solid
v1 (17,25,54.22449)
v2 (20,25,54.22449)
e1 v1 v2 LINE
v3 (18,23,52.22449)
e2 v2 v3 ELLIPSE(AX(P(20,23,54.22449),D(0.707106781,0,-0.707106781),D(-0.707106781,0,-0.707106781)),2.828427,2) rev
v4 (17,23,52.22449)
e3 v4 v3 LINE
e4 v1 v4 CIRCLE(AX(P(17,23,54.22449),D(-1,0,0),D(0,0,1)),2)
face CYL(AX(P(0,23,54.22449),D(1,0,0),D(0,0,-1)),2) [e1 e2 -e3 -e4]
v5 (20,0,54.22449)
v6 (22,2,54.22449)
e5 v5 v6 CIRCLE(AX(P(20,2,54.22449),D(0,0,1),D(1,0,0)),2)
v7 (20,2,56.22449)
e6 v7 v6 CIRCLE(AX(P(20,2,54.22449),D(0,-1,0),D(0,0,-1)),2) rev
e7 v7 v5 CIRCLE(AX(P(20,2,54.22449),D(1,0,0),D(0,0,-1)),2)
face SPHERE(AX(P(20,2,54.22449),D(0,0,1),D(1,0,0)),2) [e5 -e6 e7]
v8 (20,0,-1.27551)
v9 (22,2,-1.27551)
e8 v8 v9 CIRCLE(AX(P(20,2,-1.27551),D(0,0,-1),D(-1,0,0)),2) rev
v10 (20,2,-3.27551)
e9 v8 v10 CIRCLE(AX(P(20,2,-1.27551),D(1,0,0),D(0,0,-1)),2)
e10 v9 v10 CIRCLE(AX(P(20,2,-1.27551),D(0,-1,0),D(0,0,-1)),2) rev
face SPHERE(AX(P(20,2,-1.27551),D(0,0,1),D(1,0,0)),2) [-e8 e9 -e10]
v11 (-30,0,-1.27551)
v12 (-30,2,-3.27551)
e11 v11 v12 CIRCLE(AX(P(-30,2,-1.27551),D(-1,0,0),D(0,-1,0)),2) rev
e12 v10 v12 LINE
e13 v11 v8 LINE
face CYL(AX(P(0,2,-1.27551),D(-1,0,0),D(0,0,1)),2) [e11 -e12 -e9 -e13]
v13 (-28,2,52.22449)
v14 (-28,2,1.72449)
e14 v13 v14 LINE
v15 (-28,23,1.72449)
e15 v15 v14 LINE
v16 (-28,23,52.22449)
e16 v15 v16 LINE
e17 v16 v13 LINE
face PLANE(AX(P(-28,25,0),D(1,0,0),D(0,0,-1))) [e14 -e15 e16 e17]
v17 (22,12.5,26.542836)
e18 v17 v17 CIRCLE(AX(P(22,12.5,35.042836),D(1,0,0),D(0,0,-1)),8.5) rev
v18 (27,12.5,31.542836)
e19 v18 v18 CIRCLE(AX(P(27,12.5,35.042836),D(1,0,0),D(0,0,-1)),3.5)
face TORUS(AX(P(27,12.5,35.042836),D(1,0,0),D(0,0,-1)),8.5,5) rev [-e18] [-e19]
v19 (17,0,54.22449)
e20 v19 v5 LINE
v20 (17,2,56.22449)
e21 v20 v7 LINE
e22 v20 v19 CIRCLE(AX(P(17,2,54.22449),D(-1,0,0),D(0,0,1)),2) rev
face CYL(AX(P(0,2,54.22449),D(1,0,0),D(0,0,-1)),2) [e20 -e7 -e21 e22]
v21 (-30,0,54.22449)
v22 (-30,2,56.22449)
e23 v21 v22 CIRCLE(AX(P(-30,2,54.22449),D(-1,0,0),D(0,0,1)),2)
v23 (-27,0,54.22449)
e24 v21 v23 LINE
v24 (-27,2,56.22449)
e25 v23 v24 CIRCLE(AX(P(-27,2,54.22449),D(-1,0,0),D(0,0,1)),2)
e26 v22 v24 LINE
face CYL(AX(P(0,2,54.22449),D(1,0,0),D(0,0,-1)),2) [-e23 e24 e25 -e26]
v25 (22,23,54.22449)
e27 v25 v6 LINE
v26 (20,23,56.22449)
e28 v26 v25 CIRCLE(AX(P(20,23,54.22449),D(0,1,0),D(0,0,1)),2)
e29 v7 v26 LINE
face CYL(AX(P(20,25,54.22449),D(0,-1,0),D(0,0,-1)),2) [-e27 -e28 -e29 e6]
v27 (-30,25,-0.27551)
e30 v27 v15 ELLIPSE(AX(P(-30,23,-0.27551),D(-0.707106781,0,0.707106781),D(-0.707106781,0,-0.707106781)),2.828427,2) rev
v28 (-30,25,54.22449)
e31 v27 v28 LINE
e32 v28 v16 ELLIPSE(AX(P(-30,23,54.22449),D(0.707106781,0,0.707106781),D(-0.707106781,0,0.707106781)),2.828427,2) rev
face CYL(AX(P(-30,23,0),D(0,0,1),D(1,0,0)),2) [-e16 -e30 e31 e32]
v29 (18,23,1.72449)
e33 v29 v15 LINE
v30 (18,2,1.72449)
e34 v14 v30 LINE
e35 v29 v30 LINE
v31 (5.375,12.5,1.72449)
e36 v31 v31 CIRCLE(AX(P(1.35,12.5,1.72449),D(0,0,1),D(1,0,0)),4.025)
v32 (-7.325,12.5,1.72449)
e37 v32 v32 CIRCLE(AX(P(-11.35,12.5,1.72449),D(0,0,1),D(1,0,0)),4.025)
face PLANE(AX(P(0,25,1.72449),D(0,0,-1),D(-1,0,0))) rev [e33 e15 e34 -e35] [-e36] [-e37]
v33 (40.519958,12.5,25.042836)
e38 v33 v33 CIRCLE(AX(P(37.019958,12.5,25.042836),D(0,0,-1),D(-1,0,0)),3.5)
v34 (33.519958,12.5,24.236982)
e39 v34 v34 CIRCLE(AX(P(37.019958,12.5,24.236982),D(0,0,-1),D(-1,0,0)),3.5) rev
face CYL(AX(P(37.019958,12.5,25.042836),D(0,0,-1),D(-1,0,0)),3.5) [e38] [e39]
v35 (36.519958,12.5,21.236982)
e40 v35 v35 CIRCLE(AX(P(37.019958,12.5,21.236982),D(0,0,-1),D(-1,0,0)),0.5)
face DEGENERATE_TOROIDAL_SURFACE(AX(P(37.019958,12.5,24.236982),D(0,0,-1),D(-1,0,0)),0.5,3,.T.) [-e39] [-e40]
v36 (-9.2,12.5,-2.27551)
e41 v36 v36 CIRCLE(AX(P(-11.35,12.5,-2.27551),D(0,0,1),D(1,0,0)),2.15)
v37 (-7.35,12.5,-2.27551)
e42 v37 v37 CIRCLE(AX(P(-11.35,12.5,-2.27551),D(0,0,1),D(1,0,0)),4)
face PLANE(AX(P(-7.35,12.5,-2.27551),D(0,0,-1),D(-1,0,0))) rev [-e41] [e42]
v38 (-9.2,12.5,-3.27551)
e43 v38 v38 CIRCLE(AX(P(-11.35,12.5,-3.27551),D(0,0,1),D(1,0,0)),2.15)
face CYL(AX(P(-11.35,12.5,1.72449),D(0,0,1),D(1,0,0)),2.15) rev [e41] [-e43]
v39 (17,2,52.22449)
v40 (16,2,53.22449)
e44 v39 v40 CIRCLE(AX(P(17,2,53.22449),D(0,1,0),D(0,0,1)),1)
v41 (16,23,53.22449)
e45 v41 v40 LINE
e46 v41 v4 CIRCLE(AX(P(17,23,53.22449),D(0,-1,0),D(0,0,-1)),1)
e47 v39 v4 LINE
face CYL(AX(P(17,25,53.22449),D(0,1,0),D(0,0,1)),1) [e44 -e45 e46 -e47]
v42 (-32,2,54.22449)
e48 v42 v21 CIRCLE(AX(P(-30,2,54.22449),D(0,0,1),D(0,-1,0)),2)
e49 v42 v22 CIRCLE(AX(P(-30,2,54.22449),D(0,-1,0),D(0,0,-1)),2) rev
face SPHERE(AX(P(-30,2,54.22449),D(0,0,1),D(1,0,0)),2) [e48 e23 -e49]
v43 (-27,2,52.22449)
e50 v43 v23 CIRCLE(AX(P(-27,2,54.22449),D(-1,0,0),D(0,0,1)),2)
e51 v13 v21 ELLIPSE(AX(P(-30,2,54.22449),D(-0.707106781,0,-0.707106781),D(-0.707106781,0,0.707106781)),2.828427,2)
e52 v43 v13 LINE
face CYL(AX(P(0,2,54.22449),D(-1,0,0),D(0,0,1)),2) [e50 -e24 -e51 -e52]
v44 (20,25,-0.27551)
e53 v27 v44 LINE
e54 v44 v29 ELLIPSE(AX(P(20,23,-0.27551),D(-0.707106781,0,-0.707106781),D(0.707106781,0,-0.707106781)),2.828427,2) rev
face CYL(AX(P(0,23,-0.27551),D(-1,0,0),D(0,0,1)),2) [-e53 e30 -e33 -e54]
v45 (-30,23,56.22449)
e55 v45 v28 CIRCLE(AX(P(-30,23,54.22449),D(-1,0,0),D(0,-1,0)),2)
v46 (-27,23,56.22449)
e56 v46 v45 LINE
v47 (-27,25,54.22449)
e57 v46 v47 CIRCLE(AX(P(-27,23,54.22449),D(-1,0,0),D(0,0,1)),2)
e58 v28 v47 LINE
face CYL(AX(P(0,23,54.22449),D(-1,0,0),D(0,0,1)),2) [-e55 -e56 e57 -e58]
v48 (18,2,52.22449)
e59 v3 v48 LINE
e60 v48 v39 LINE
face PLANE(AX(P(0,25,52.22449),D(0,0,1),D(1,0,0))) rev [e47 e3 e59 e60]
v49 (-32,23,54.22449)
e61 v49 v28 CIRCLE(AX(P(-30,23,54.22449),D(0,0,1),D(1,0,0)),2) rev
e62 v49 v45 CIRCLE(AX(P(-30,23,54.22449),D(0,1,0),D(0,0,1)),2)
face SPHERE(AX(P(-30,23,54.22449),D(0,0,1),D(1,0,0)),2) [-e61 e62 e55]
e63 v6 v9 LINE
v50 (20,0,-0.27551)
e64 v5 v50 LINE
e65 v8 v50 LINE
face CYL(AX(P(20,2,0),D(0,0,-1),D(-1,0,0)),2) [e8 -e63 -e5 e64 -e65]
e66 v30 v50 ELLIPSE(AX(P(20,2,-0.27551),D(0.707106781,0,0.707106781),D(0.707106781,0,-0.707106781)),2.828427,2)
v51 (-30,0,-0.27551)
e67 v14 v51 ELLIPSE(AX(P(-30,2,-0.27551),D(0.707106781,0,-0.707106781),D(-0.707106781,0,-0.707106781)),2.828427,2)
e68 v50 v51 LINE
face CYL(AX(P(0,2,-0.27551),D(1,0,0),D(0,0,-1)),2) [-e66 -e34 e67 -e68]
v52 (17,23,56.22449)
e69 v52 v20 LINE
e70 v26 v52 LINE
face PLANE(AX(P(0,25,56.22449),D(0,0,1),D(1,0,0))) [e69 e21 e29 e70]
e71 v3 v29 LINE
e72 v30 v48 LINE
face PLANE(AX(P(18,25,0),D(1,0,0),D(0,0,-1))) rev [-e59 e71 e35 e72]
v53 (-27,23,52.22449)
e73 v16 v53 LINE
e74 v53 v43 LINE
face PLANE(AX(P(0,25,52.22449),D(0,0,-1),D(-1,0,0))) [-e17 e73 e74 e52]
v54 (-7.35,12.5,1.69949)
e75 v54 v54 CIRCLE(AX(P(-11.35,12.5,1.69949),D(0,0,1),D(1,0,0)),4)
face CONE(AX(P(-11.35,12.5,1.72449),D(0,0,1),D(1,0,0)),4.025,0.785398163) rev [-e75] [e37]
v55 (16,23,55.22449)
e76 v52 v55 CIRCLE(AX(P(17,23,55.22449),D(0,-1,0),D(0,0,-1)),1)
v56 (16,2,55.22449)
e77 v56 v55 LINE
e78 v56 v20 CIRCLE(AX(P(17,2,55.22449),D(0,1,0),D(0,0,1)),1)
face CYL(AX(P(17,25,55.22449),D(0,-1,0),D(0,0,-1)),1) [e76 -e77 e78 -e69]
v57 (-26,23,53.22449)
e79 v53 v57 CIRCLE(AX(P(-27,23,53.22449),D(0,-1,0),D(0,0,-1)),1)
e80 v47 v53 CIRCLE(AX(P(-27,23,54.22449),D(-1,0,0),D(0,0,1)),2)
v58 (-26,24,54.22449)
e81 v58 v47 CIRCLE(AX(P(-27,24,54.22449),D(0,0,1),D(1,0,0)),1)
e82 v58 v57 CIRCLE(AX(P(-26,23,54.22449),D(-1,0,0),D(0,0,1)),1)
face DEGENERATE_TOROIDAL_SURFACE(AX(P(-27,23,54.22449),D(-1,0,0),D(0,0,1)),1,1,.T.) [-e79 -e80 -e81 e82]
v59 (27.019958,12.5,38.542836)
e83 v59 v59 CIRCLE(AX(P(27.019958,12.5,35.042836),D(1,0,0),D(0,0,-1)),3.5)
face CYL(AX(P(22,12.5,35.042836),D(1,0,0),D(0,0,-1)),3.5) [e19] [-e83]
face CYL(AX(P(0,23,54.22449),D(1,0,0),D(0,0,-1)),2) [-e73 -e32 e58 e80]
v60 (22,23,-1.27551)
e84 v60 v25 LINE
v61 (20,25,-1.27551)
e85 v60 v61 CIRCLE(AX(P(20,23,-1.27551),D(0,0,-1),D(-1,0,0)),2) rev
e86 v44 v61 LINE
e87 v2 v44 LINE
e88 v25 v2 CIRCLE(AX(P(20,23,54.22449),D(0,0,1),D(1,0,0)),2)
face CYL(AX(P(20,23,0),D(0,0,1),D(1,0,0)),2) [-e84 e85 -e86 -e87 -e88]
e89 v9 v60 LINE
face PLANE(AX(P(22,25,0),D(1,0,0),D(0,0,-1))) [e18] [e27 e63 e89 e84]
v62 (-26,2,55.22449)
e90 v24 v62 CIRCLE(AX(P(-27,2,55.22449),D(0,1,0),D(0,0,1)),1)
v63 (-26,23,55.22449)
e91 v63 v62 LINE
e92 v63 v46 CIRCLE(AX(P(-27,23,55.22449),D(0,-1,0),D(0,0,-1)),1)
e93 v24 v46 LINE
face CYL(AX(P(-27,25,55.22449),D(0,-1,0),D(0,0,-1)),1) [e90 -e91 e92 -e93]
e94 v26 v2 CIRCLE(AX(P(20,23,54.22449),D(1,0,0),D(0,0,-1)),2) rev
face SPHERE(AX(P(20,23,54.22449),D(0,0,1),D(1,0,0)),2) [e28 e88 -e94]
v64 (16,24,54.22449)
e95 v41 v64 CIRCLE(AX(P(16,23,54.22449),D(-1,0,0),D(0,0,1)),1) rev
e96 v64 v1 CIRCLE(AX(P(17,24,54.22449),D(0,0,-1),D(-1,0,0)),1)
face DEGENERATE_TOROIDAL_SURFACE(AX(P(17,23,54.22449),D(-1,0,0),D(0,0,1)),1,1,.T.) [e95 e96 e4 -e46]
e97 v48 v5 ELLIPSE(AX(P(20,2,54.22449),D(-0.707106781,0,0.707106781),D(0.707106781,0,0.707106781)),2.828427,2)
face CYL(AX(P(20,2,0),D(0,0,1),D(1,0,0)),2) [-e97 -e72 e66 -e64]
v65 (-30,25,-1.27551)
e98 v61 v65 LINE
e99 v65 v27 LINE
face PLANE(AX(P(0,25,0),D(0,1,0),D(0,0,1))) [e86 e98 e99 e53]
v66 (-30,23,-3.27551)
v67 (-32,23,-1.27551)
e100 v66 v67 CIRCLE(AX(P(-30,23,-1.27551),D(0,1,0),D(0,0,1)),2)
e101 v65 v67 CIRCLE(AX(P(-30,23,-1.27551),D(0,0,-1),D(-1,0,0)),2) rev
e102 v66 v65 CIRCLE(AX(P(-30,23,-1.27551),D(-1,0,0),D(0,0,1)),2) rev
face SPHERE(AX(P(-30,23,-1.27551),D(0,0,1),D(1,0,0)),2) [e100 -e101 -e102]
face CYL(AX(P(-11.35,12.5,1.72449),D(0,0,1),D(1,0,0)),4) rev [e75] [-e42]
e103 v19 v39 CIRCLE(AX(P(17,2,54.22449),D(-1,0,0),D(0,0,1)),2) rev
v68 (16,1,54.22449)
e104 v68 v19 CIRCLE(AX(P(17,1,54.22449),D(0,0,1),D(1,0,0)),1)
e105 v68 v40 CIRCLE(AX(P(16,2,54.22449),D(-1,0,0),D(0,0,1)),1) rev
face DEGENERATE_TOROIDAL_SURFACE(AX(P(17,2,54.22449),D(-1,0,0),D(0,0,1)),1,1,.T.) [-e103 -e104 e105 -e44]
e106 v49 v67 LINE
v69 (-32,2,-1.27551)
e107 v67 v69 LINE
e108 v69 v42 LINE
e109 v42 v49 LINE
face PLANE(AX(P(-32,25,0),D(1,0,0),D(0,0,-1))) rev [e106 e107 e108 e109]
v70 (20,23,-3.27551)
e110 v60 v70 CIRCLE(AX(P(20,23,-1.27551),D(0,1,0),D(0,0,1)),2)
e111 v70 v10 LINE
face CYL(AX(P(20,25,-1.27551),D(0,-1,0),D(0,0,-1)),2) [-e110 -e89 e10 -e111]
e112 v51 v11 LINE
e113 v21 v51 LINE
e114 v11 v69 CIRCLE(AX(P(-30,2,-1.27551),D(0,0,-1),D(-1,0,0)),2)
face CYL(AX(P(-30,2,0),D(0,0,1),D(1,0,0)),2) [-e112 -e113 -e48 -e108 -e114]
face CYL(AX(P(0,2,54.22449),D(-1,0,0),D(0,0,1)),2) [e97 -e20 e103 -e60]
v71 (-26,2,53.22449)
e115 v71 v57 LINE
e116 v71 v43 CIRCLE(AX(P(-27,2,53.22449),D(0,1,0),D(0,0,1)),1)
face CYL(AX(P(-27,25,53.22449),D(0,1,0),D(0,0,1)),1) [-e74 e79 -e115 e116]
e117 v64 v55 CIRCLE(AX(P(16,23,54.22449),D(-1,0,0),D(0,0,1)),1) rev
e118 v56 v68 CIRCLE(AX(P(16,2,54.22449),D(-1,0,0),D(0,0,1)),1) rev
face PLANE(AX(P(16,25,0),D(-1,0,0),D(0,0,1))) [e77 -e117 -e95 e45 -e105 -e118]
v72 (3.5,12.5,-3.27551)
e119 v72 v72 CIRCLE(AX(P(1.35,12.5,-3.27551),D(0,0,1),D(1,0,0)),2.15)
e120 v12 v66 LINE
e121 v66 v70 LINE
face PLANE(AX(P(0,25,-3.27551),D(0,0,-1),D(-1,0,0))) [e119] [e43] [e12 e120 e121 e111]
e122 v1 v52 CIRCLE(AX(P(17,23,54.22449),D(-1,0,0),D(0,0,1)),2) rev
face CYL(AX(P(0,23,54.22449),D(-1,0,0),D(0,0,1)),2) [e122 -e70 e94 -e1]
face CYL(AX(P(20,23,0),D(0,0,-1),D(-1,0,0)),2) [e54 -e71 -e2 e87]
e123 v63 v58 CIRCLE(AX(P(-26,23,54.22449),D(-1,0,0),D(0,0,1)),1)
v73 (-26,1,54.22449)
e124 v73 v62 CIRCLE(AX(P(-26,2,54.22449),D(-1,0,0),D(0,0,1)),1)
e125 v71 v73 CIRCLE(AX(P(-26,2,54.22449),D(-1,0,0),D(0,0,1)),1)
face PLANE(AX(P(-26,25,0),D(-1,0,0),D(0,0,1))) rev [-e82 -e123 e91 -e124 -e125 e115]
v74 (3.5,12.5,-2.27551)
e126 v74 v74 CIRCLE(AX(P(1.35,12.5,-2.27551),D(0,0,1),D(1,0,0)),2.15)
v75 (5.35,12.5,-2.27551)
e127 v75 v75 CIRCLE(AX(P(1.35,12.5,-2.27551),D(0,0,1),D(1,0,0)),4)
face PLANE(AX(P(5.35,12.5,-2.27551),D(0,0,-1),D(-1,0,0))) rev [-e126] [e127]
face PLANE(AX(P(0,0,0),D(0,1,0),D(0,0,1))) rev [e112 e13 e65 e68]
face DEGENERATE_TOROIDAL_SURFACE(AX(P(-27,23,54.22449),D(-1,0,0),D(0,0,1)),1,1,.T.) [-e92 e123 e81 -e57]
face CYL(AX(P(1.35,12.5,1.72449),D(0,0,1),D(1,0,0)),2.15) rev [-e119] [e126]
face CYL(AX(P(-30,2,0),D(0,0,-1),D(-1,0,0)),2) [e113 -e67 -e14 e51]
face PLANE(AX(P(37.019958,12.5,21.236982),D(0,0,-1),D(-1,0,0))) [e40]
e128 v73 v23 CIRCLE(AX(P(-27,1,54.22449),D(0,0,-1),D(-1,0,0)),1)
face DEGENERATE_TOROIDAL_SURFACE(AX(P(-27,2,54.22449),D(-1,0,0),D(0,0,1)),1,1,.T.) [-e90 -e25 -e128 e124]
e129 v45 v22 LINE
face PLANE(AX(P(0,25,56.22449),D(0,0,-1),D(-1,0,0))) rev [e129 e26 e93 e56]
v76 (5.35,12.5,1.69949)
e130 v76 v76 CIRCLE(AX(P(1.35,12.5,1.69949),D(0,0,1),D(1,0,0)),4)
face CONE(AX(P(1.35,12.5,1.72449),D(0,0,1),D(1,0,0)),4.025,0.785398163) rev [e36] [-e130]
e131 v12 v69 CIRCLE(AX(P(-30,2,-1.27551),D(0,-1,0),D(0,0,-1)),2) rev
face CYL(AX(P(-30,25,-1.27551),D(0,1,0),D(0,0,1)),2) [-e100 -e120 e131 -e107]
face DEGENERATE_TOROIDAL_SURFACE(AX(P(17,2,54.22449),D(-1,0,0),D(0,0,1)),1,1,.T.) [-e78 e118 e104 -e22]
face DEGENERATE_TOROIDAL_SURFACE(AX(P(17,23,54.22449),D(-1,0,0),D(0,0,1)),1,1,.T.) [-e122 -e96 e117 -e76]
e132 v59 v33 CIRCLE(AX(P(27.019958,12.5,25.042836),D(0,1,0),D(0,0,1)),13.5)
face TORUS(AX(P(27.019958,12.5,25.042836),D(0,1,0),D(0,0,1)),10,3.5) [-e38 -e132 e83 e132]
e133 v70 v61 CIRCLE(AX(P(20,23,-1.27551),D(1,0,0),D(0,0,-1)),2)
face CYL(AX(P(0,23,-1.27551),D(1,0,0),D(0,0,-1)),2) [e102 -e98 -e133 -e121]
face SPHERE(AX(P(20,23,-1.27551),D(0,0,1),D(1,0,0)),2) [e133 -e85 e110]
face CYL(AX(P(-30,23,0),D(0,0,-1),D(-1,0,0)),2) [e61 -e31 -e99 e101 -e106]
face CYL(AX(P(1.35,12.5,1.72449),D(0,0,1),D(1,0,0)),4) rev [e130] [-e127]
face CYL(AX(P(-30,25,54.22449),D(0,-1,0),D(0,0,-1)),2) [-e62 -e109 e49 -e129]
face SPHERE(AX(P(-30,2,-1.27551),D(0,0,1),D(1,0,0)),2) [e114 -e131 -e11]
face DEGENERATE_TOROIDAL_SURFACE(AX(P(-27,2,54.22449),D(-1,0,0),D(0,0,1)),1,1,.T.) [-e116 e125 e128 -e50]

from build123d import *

# Parameters (mm, degrees)
BOSS_EXTRUDE1_DEPTH           = 25
FILLET1_R                     = 1
CBORE_FOR_M4_SHCS1_AT_2_COUNT = 2
CBORE_FOR_M4_SHCS1_AT_2_PITCH = 12.7
FILLET2_R                     = 2
SKETCH4_R                     = 3.5
FILLET3_R                     = 5
FILLET4_R                     = 3


with BuildPart() as part:
    # Sketch1 → Boss-Extrude1 (new body)
    with BuildSketch(Plane(origin=(0, 0, 0), x_dir=(1, 0, 0), z_dir=(0, 1, 0))):
        Polygon((18, -1.724489796), (18, -52.224489796), (16, -52.224489796), (16, -56.224489796), (18, -56.224489796), (22, -56.224489796), (22, 3.275510204), (-32, 3.275510204), (-32, -56.224489796), (-28, -56.224489796), (-26, -56.224489796), (-26, -52.224489796), (-28, -52.224489796), (-28, -1.724489796), align=None)
    extrude(amount=BOSS_EXTRUDE1_DEPTH)

    # Fillet1
    fillet1_edges = [part.edges().sort_by_distance(p)[0] for p in [
        (-26, 0, 54.224489796),
        (16, 0, 54.224489796),
        (16, 12.5, 52.224489796),
        (-26, 12.5, 52.224489796),
        (-26, 12.5, 56.224489796),
        (16, 12.5, 56.224489796),
        (-26, 25, 54.224489796),
        (16, 25, 54.224489796),
    ]]
    fillet(fillet1_edges, radius=FILLET1_R)

    # Sketch3 → CBORE for M4 SHCS1 (revolve, cut)
    with BuildSketch(Plane(origin=(1.35, 12.5, 1.724489796), x_dir=(0, -1, 0), z_dir=(1, 0, 0))):
        Polygon((0, 0), (0, 5), (2.15, 5), (2.15, 4), (4, 4), (4, 0.025), (4.025, 0), align=None)
    cbore_for_m4_shcs1 = revolve(axis=Axis((1.35, 12.5, 8.074489796), (0, 0, -1)), mode=Mode.SUBTRACT)

    # CBORE for M4 SHCS1 at 2: CBORE for M4 SHCS1 ×2
    with Locations(*[(-i * CBORE_FOR_M4_SHCS1_AT_2_PITCH, 0, 0) for i in range(1, CBORE_FOR_M4_SHCS1_AT_2_COUNT)]):
        add(cbore_for_m4_shcs1, mode=Mode.SUBTRACT)

    # Fillet2
    # the kernel refuses this fillet: 2 mm, written as the material it takes off along each edge
    with BuildSketch(Plane(origin=(16, 23, 54.224489796), x_dir=(0, 1, 0), z_dir=(0, 0, 1))) as fillet2_piece_1:
        with BuildLine():
            CenterArc((1, -1), 1, 0, 90)
            Line((2, -1), (2, 0))
            Line((2, 0), (1, 0))
        make_face()
    revolve(axis=Axis((16, 23, 54.224489796), (-1, 0, 0)), revolution_arc=90, mode=Mode.SUBTRACT)
    with BuildSketch(Plane(origin=(16, 23, 54.224489796), x_dir=(0, 0, 1), z_dir=(0, -1, 0))) as fillet2_piece_2:
        with BuildLine():
            CenterArc((1, -1), 1, 0, 90)
            Line((2, -1), (2, 0))
            Line((2, 0), (1, 0))
        make_face()
    revolve(axis=Axis((16, 23, 54.224489796), (-1, 0, 0)), revolution_arc=90, mode=Mode.SUBTRACT)
    with BuildSketch(Plane(origin=(-26, 23, 54.224489796), x_dir=(0, 1, 0), z_dir=(0, 0, -1))) as fillet2_piece_3:
        with BuildLine():
            CenterArc((1, -1), 1, 0, 90)
            Line((2, -1), (2, 0))
            Line((2, 0), (1, 0))
        make_face()
    revolve(axis=Axis((-26, 23, 54.224489796), (1, 0, 0)), revolution_arc=90, mode=Mode.SUBTRACT)
    with BuildSketch(Plane(origin=(-26, 23, 54.224489796), x_dir=(0, 0, -1), z_dir=(0, -1, 0))) as fillet2_piece_4:
        with BuildLine():
            CenterArc((1, -1), 1, 0, 90)
            Line((2, -1), (2, 0))
            Line((2, 0), (1, 0))
        make_face()
    revolve(axis=Axis((-26, 23, 54.224489796), (1, 0, 0)), revolution_arc=90, mode=Mode.SUBTRACT)
    with BuildSketch(Plane(origin=(16, 2, 54.224489796), x_dir=(0, -1, 0), z_dir=(0, 0, -1))) as fillet2_piece_5:
        with BuildLine():
            CenterArc((1, -1), 1, 0, 90)
            Line((2, -1), (2, 0))
            Line((2, 0), (1, 0))
        make_face()
    revolve(axis=Axis((16, 2, 54.224489796), (-1, 0, 0)), revolution_arc=90, mode=Mode.SUBTRACT)
    with BuildSketch(Plane(origin=(16, 2, 54.224489796), x_dir=(0, 0, -1), z_dir=(0, 1, 0))) as fillet2_piece_6:
        with BuildLine():
            CenterArc((1, -1), 1, 0, 90)
            Line((2, -1), (2, 0))
            Line((2, 0), (1, 0))
        make_face()
    revolve(axis=Axis((16, 2, 54.224489796), (-1, 0, 0)), revolution_arc=90, mode=Mode.SUBTRACT)
    with BuildSketch(Plane(origin=(-26, 2, 54.224489796), x_dir=(0, -1, 0), z_dir=(0, 0, 1))) as fillet2_piece_7:
        with BuildLine():
            CenterArc((1, -1), 1, 0, 90)
            Line((2, -1), (2, 0))
            Line((2, 0), (1, 0))
        make_face()
    revolve(axis=Axis((-26, 2, 54.224489796), (1, 0, 0)), revolution_arc=90, mode=Mode.SUBTRACT)
    with BuildSketch(Plane(origin=(-26, 2, 54.224489796), x_dir=(0, 0, 1), z_dir=(0, 1, 0))) as fillet2_piece_8:
        with BuildLine():
            CenterArc((1, -1), 1, 0, 90)
            Line((2, -1), (2, 0))
            Line((2, 0), (1, 0))
        make_face()
    revolve(axis=Axis((-26, 2, 54.224489796), (1, 0, 0)), revolution_arc=90, mode=Mode.SUBTRACT)
    with BuildSketch(Plane(origin=(20, 2, -1.275510204), x_dir=(0, -1, 0), z_dir=(0, 0, -1))) as fillet2_piece_9_section:
        Polygon((0, 0), (FILLET2_R, 0), (FILLET2_R, -FILLET2_R), (0, -FILLET2_R), align=None)
    fillet2_piece_9 = extrude(amount=FILLET2_R, mode=Mode.PRIVATE)
    fillet2_piece_9 = fillet2_piece_9 - Plane(origin=(20, 2, -1.275510204), x_dir=(-0.7071067811865475, 0.7071067811865475, 0), z_dir=(0, 0, -1)) * Sphere(FILLET2_R, mode=Mode.PRIVATE)
    add(fillet2_piece_9, mode=Mode.SUBTRACT)
    with BuildSketch(Plane(origin=(-30, 2, -1.275510204), x_dir=(-1, 0, 0), z_dir=(0, 0, -1))) as fillet2_piece_10_section:
        Polygon((0, 0), (FILLET2_R, 0), (FILLET2_R, -FILLET2_R), (0, -FILLET2_R), align=None)
    fillet2_piece_10 = extrude(amount=FILLET2_R, mode=Mode.PRIVATE)
    fillet2_piece_10 = fillet2_piece_10 - Plane(origin=(-30, 2, -1.275510204), x_dir=(0.7071067811865475, 0.7071067811865475, 0), z_dir=(0, 0, -1)) * Sphere(FILLET2_R, mode=Mode.PRIVATE)
    add(fillet2_piece_10, mode=Mode.SUBTRACT)
    with BuildSketch(Plane(origin=(-30, 2, 54.224489796), x_dir=(0, 0, 1), z_dir=(-1, 0, 0))) as fillet2_piece_11_section:
        Polygon((0, 0), (FILLET2_R, 0), (FILLET2_R, -FILLET2_R), (0, -FILLET2_R), align=None)
    fillet2_piece_11 = extrude(amount=FILLET2_R, mode=Mode.PRIVATE)
    fillet2_piece_11 = fillet2_piece_11 - Plane(origin=(-30, 2, 54.224489796), x_dir=(1.25607396694702e-15, 0.7071067811865475, -0.7071067811865475), z_dir=(-1, 0, 0)) * Sphere(FILLET2_R, mode=Mode.PRIVATE)
    add(fillet2_piece_11, mode=Mode.SUBTRACT)
    with BuildSketch(Plane(origin=(20, 2, 54.224489796), x_dir=(0, -1, 0), z_dir=(0, 0, 1))) as fillet2_piece_12_section:
        Polygon((0, 0), (FILLET2_R, 0), (FILLET2_R, FILLET2_R), (0, FILLET2_R), align=None)
    fillet2_piece_12 = extrude(amount=FILLET2_R, mode=Mode.PRIVATE)
    fillet2_piece_12 = fillet2_piece_12 - Plane(origin=(20, 2, 54.224489796), x_dir=(-0.7071067811865475, 0.7071067811865475, 0), z_dir=(0, 0, 1)) * Sphere(FILLET2_R, mode=Mode.PRIVATE)
    add(fillet2_piece_12, mode=Mode.SUBTRACT)
    with BuildSketch(Plane(origin=(-30, 23, 54.224489796), x_dir=(-1, 0, 0), z_dir=(0, 1, 0))) as fillet2_piece_13_section:
        Polygon((0, 0), (FILLET2_R, 0), (FILLET2_R, FILLET2_R), (0, FILLET2_R), align=None)
    fillet2_piece_13 = extrude(amount=FILLET2_R, mode=Mode.PRIVATE)
    fillet2_piece_13 = fillet2_piece_13 - Plane(origin=(-30, 23, 54.224489796), x_dir=(0.707106781186548, 0, -0.707106781186547), z_dir=(0, 1, 0)) * Sphere(FILLET2_R, mode=Mode.PRIVATE)
    add(fillet2_piece_13, mode=Mode.SUBTRACT)
    with BuildSketch(Plane(origin=(20, 23, -1.275510204), x_dir=(0, 0, -1), z_dir=(0, 1, 0))) as fillet2_piece_14_section:
        Polygon((0, 0), (FILLET2_R, 0), (FILLET2_R, -FILLET2_R), (0, -FILLET2_R), align=None)
    fillet2_piece_14 = extrude(amount=FILLET2_R, mode=Mode.PRIVATE)
    fillet2_piece_14 = fillet2_piece_14 - Plane(origin=(20, 23, -1.275510204), x_dir=(-0.7071067811865475, 0, 0.7071067811865477), z_dir=(0, 1, 0)) * Sphere(FILLET2_R, mode=Mode.PRIVATE)
    add(fillet2_piece_14, mode=Mode.SUBTRACT)
    with BuildSketch(Plane(origin=(-30, 23, -1.275510204), x_dir=(0, 0, -1), z_dir=(0, 1, 0))) as fillet2_piece_15_section:
        Polygon((0, 0), (FILLET2_R, 0), (FILLET2_R, FILLET2_R), (0, FILLET2_R), align=None)
    fillet2_piece_15 = extrude(amount=FILLET2_R, mode=Mode.PRIVATE)
    fillet2_piece_15 = fillet2_piece_15 - Plane(origin=(-30, 23, -1.275510204), x_dir=(0.7071067811865476, 0, 0.7071067811865475), z_dir=(0, 1, 0)) * Sphere(FILLET2_R, mode=Mode.PRIVATE)
    add(fillet2_piece_15, mode=Mode.SUBTRACT)
    with BuildSketch(Plane(origin=(20, 23, 54.224489796), x_dir=(0, 0, 1), z_dir=(0, 1, 0))) as fillet2_piece_16_section:
        Polygon((0, 0), (FILLET2_R, 0), (FILLET2_R, FILLET2_R), (0, FILLET2_R), align=None)
    fillet2_piece_16 = extrude(amount=FILLET2_R, mode=Mode.PRIVATE)
    fillet2_piece_16 = fillet2_piece_16 - Plane(origin=(20, 23, 54.224489796), x_dir=(-0.7071067811865464, 0, -0.7071067811865487), z_dir=(0, 1, 0)) * Sphere(FILLET2_R, mode=Mode.PRIVATE)
    add(fillet2_piece_16, mode=Mode.SUBTRACT)
    with BuildSketch(Plane(origin=(20, 0, -3.275510204), x_dir=(0, 1, 0), z_dir=(-1, 0, 0)), Plane(origin=(20, 25, -3.275510204), x_dir=(0, 0, 1), z_dir=(-1, 0, 0))) as fillet2_piece_17:
        with BuildLine():
            CenterArc((FILLET2_R, -FILLET2_R), FILLET2_R, 90, 90)
            Line((0, -FILLET2_R), (0, 0))
            Line((0, 0), (FILLET2_R, 0))
        make_face()
    extrude(amount=50, mode=Mode.SUBTRACT)
    with BuildSketch(Plane(origin=(-30, 0, 56.224489796), x_dir=(0, 1, 0), z_dir=(1, 0, 0)), Plane(origin=(16, 0, 56.224489796), x_dir=(0, 1, 0), z_dir=(1, 0, 0))) as fillet2_piece_18:
        with BuildLine():
            CenterArc((FILLET2_R, -FILLET2_R), FILLET2_R, 90, 90)
            Line((0, -FILLET2_R), (0, 0))
            Line((0, 0), (FILLET2_R, 0))
        make_face()
    extrude(amount=4, mode=Mode.SUBTRACT)
    with BuildSketch(Plane(origin=(-26, 0, 52.224489796), x_dir=(0, 1, 0), z_dir=(-1, 0, 0)), Plane(origin=(18, 0, 52.224489796), x_dir=(0, 1, 0), z_dir=(-1, 0, 0)), Plane(origin=(-26, 25, 52.224489796), x_dir=(0, 0, 1), z_dir=(-1, 0, 0)), Plane(origin=(18, 25, 52.224489796), x_dir=(0, 0, 1), z_dir=(-1, 0, 0))) as fillet2_piece_19:
        with BuildLine():
            CenterArc((FILLET2_R, -FILLET2_R), FILLET2_R, 90, 90)
            Line((0, -FILLET2_R), (0, 0))
            Line((0, 0), (FILLET2_R, 0))
        make_face()
    extrude(amount=2, mode=Mode.SUBTRACT)
    with BuildSketch(Plane(origin=(-28, 0, 52.224489796), x_dir=(0, 1, 0), z_dir=(0, 0, -1)), Plane(origin=(18, 0, 1.724489796), x_dir=(0, 1, 0), z_dir=(0, 0, 1)), Plane(origin=(18, 25, 1.724489796), x_dir=(1, 0, 0), z_dir=(0, 0, 1)), Plane(origin=(-28, 25, 52.224489796), x_dir=(-1, 0, 0), z_dir=(0, 0, -1))) as fillet2_piece_20:
        with BuildLine():
            CenterArc((FILLET2_R, -FILLET2_R), FILLET2_R, 90, 90)
            Line((0, -FILLET2_R), (0, 0))
            Line((0, 0), (FILLET2_R, 0))
        make_face()
    extrude(amount=50.5, mode=Mode.SUBTRACT)
    with BuildSketch(Plane(origin=(-28, 0, 1.724489796), x_dir=(0, 1, 0), z_dir=(1, 0, 0)), Plane(origin=(-28, 25, 1.724489796), x_dir=(0, 0, -1), z_dir=(1, 0, 0))) as fillet2_piece_21:
        with BuildLine():
            CenterArc((FILLET2_R, -FILLET2_R), FILLET2_R, 90, 90)
            Line((0, -FILLET2_R), (0, 0))
            Line((0, 0), (FILLET2_R, 0))
        make_face()
    extrude(amount=46, mode=Mode.SUBTRACT)
    with BuildSketch(Plane(origin=(-26, 25, 56.224489796), x_dir=(0, 0, -1), z_dir=(-1, 0, 0)), Plane(origin=(20, 25, 56.224489796), x_dir=(0, 0, -1), z_dir=(-1, 0, 0))) as fillet2_piece_22:
        with BuildLine():
            CenterArc((FILLET2_R, FILLET2_R), FILLET2_R, 180, 90)
            Line((0, FILLET2_R), (0, 0))
            Line((0, 0), (FILLET2_R, 0))
        make_face()
    extrude(amount=4, mode=Mode.SUBTRACT)
    with BuildSketch(Plane(origin=(-32, 2, -3.275510204), x_dir=(1, 0, 0), z_dir=(0, 1, 0)), Plane(origin=(-32, 2, 56.224489796), x_dir=(0, 0, -1), z_dir=(0, 1, 0)), Plane(origin=(22, 2, 56.224489796), x_dir=(-1, 0, 0), z_dir=(0, 1, 0)), Plane(origin=(22, 2, -3.275510204), x_dir=(0, 0, 1), z_dir=(0, 1, 0))) as fillet2_piece_23:
        with BuildLine():
            CenterArc((FILLET2_R, -FILLET2_R), FILLET2_R, 90, 90)
            Line((0, -FILLET2_R), (0, 0))
            Line((0, 0), (FILLET2_R, 0))
        make_face()
    extrude(amount=21, mode=Mode.SUBTRACT)
    with BuildSketch(Plane(origin=(-32, 25, -1.275510204), x_dir=(1, 0, 0), z_dir=(0, 0, 1)), Plane(origin=(-32, 0, -1.275510204), x_dir=(0, 1, 0), z_dir=(0, 0, 1)), Plane(origin=(22, 25, 54.224489796), x_dir=(-1, 0, 0), z_dir=(0, 0, -1)), Plane(origin=(22, 0, 54.224489796), x_dir=(0, 1, 0), z_dir=(0, 0, -1))) as fillet2_piece_24:
        with BuildLine():
            CenterArc((FILLET2_R, -FILLET2_R), FILLET2_R, 90, 90)
            Line((0, -FILLET2_R), (0, 0))
            Line((0, 0), (FILLET2_R, 0))
        make_face()
    extrude(amount=55.5, mode=Mode.SUBTRACT)
    with BuildSketch(Plane(origin=(-28, 0, 57.224489796), x_dir=(0, 1, 0), z_dir=(0, 0, -1))) as fillet2_piece_25a_section:
        with BuildLine():
            CenterArc((FILLET2_R, -FILLET2_R), FILLET2_R, 90, 90)
            Line((0, -FILLET2_R), (0, 0))
            Line((0, 0), (FILLET2_R, 0))
        make_face()
    fillet2_piece_25a = extrude(amount=55.5, mode=Mode.PRIVATE)
    fillet2_piece_25a = split(fillet2_piece_25a, bisect_by=Plane(origin=(-28.452790229, 0.452790229, 52.224489796), z_dir=(0, 0, 1)), keep=Keep.TOP, mode=Mode.PRIVATE)
    with BuildSketch(Plane(origin=(-26, 0, 52.224489796), x_dir=(0, 1, 0), z_dir=(-1, 0, 0))) as fillet2_piece_25b_section:
        with BuildLine():
            CenterArc((FILLET2_R, -FILLET2_R), FILLET2_R, 90, 90)
            Line((0, -FILLET2_R), (0, 0))
            Line((0, 0), (FILLET2_R, 0))
        make_face()
    fillet2_piece_25b = extrude(amount=7, mode=Mode.PRIVATE)
    fillet2_piece_25b = split(fillet2_piece_25b, bisect_by=Plane(origin=(-28, 0.452790229, 52.677280024), z_dir=(-1, 0, 0)), keep=Keep.TOP, mode=Mode.PRIVATE)
    fillet2_piece_25 = fillet2_piece_25a & fillet2_piece_25b
    add(fillet2_piece_25, mode=Mode.SUBTRACT)
    with BuildSketch(Plane(origin=(-33, 0, 1.724489796), x_dir=(0, 1, 0), z_dir=(1, 0, 0))) as fillet2_piece_26a_section:
        with BuildLine():
            CenterArc((FILLET2_R, -FILLET2_R), FILLET2_R, 90, 90)
            Line((0, -FILLET2_R), (0, 0))
            Line((0, 0), (FILLET2_R, 0))
        make_face()
    fillet2_piece_26a = extrude(amount=51, mode=Mode.PRIVATE)
    fillet2_piece_26a = split(fillet2_piece_26a, bisect_by=Plane(origin=(-28, 0.452790229, 1.271699567), z_dir=(-1, 0, 0)), keep=Keep.TOP, mode=Mode.PRIVATE)
    with BuildSketch(Plane(origin=(-28, 0, 52.224489796), x_dir=(0, 1, 0), z_dir=(0, 0, -1))) as fillet2_piece_26b_section:
        with BuildLine():
            CenterArc((FILLET2_R, -FILLET2_R), FILLET2_R, 90, 90)
            Line((0, -FILLET2_R), (0, 0))
            Line((0, 0), (FILLET2_R, 0))
        make_face()
    fillet2_piece_26b = extrude(amount=55.5, mode=Mode.PRIVATE)
    fillet2_piece_26b = split(fillet2_piece_26b, bisect_by=Plane(origin=(-28.452790229, 0.452790229, 1.724489796), z_dir=(0, 0, -1)), keep=Keep.TOP, mode=Mode.PRIVATE)
    fillet2_piece_26 = fillet2_piece_26a & fillet2_piece_26b
    add(fillet2_piece_26, mode=Mode.SUBTRACT)
    with BuildSketch(Plane(origin=(18, 0, -3.275510204), x_dir=(0, 1, 0), z_dir=(0, 0, 1))) as fillet2_piece_27a_section:
        with BuildLine():
            CenterArc((FILLET2_R, -FILLET2_R), FILLET2_R, 90, 90)
            Line((0, -FILLET2_R), (0, 0))
            Line((0, 0), (FILLET2_R, 0))
        make_face()
    fillet2_piece_27a = extrude(amount=55.5, mode=Mode.PRIVATE)
    fillet2_piece_27a = split(fillet2_piece_27a, bisect_by=Plane(origin=(18.452790229, 0.452790229, 1.724489796), z_dir=(0, 0, -1)), keep=Keep.TOP, mode=Mode.PRIVATE)
    with BuildSketch(Plane(origin=(-28, 0, 1.724489796), x_dir=(0, 1, 0), z_dir=(1, 0, 0))) as fillet2_piece_27b_section:
        with BuildLine():
            CenterArc((FILLET2_R, -FILLET2_R), FILLET2_R, 90, 90)
            Line((0, -FILLET2_R), (0, 0))
            Line((0, 0), (FILLET2_R, 0))
        make_face()
    fillet2_piece_27b = extrude(amount=51, mode=Mode.PRIVATE)
    fillet2_piece_27b = split(fillet2_piece_27b, bisect_by=Plane(origin=(18, 0.452790229, 1.271699567), z_dir=(1, 0, 0)), keep=Keep.TOP, mode=Mode.PRIVATE)
    fillet2_piece_27 = fillet2_piece_27a & fillet2_piece_27b
    add(fillet2_piece_27, mode=Mode.SUBTRACT)
    with BuildSketch(Plane(origin=(23, 0, 52.224489796), x_dir=(0, 1, 0), z_dir=(-1, 0, 0))) as fillet2_piece_28a_section:
        with BuildLine():
            CenterArc((FILLET2_R, -FILLET2_R), FILLET2_R, 90, 90)
            Line((0, -FILLET2_R), (0, 0))
            Line((0, 0), (FILLET2_R, 0))
        make_face()
    fillet2_piece_28a = extrude(amount=7, mode=Mode.PRIVATE)
    fillet2_piece_28a = split(fillet2_piece_28a, bisect_by=Plane(origin=(18, 0.452790229, 52.677280024), z_dir=(1, 0, 0)), keep=Keep.TOP, mode=Mode.PRIVATE)
    with BuildSketch(Plane(origin=(18, 0, 1.724489796), x_dir=(0, 1, 0), z_dir=(0, 0, 1))) as fillet2_piece_28b_section:
        with BuildLine():
            CenterArc((FILLET2_R, -FILLET2_R), FILLET2_R, 90, 90)
            Line((0, -FILLET2_R), (0, 0))
            Line((0, 0), (FILLET2_R, 0))
        make_face()
    fillet2_piece_28b = extrude(amount=55.5, mode=Mode.PRIVATE)
    fillet2_piece_28b = split(fillet2_piece_28b, bisect_by=Plane(origin=(18.452790229, 0.452790229, 52.224489796), z_dir=(0, 0, 1)), keep=Keep.TOP, mode=Mode.PRIVATE)
    fillet2_piece_28 = fillet2_piece_28a & fillet2_piece_28b
    add(fillet2_piece_28, mode=Mode.SUBTRACT)
    with BuildSketch(Plane(origin=(18, 25, -3.275510204), x_dir=(1, 0, 0), z_dir=(0, 0, 1))) as fillet2_piece_29a_section:
        with BuildLine():
            CenterArc((FILLET2_R, -FILLET2_R), FILLET2_R, 90, 90)
            Line((0, -FILLET2_R), (0, 0))
            Line((0, 0), (FILLET2_R, 0))
        make_face()
    fillet2_piece_29a = extrude(amount=55.5, mode=Mode.PRIVATE)
    fillet2_piece_29a = split(fillet2_piece_29a, bisect_by=Plane(origin=(18.452790229, 24.547209771, 1.724489796), z_dir=(0, 0, -1)), keep=Keep.TOP, mode=Mode.PRIVATE)
    with BuildSketch(Plane(origin=(-28, 25, 1.724489796), x_dir=(0, 0, -1), z_dir=(1, 0, 0))) as fillet2_piece_29b_section:
        with BuildLine():
            CenterArc((FILLET2_R, -FILLET2_R), FILLET2_R, 90, 90)
            Line((0, -FILLET2_R), (0, 0))
            Line((0, 0), (FILLET2_R, 0))
        make_face()
    fillet2_piece_29b = extrude(amount=51, mode=Mode.PRIVATE)
    fillet2_piece_29b = split(fillet2_piece_29b, bisect_by=Plane(origin=(18, 24.547209771, 1.271699567), z_dir=(1, 0, 0)), keep=Keep.TOP, mode=Mode.PRIVATE)
    fillet2_piece_29 = fillet2_piece_29a & fillet2_piece_29b
    add(fillet2_piece_29, mode=Mode.SUBTRACT)
    with BuildSketch(Plane(origin=(23, 25, 52.224489796), x_dir=(0, 0, 1), z_dir=(-1, 0, 0))) as fillet2_piece_30a_section:
        with BuildLine():
            CenterArc((FILLET2_R, -FILLET2_R), FILLET2_R, 90, 90)
            Line((0, -FILLET2_R), (0, 0))
            Line((0, 0), (FILLET2_R, 0))
        make_face()
    fillet2_piece_30a = extrude(amount=7, mode=Mode.PRIVATE)
    fillet2_piece_30a = split(fillet2_piece_30a, bisect_by=Plane(origin=(18, 24.547209771, 52.677280024), z_dir=(1, 0, 0)), keep=Keep.TOP, mode=Mode.PRIVATE)
    with BuildSketch(Plane(origin=(18, 25, 1.724489796), x_dir=(1, 0, 0), z_dir=(0, 0, 1))) as fillet2_piece_30b_section:
        with BuildLine():
            CenterArc((FILLET2_R, -FILLET2_R), FILLET2_R, 90, 90)
            Line((0, -FILLET2_R), (0, 0))
            Line((0, 0), (FILLET2_R, 0))
        make_face()
    fillet2_piece_30b = extrude(amount=55.5, mode=Mode.PRIVATE)
    fillet2_piece_30b = split(fillet2_piece_30b, bisect_by=Plane(origin=(18.452790229, 24.547209771, 52.224489796), z_dir=(0, 0, 1)), keep=Keep.TOP, mode=Mode.PRIVATE)
    fillet2_piece_30 = fillet2_piece_30a & fillet2_piece_30b
    add(fillet2_piece_30, mode=Mode.SUBTRACT)
    with BuildSketch(Plane(origin=(-33, 25, 1.724489796), x_dir=(0, 0, -1), z_dir=(1, 0, 0))) as fillet2_piece_31a_section:
        with BuildLine():
            CenterArc((FILLET2_R, -FILLET2_R), FILLET2_R, 90, 90)
            Line((0, -FILLET2_R), (0, 0))
            Line((0, 0), (FILLET2_R, 0))
        make_face()
    fillet2_piece_31a = extrude(amount=51, mode=Mode.PRIVATE)
    fillet2_piece_31a = split(fillet2_piece_31a, bisect_by=Plane(origin=(-28, 24.547209771, 1.271699567), z_dir=(-1, 0, 0)), keep=Keep.TOP, mode=Mode.PRIVATE)
    with BuildSketch(Plane(origin=(-28, 25, 52.224489796), x_dir=(-1, 0, 0), z_dir=(0, 0, -1))) as fillet2_piece_31b_section:
        with BuildLine():
            CenterArc((FILLET2_R, -FILLET2_R), FILLET2_R, 90, 90)
            Line((0, -FILLET2_R), (0, 0))
            Line((0, 0), (FILLET2_R, 0))
        make_face()
    fillet2_piece_31b = extrude(amount=55.5, mode=Mode.PRIVATE)
    fillet2_piece_31b = split(fillet2_piece_31b, bisect_by=Plane(origin=(-28.452790229, 24.547209771, 1.724489796), z_dir=(0, 0, -1)), keep=Keep.TOP, mode=Mode.PRIVATE)
    fillet2_piece_31 = fillet2_piece_31a & fillet2_piece_31b
    add(fillet2_piece_31, mode=Mode.SUBTRACT)
    with BuildSketch(Plane(origin=(-28, 25, 57.224489796), x_dir=(-1, 0, 0), z_dir=(0, 0, -1))) as fillet2_piece_32a_section:
        with BuildLine():
            CenterArc((FILLET2_R, -FILLET2_R), FILLET2_R, 90, 90)
            Line((0, -FILLET2_R), (0, 0))
            Line((0, 0), (FILLET2_R, 0))
        make_face()
    fillet2_piece_32a = extrude(amount=55.5, mode=Mode.PRIVATE)
    fillet2_piece_32a = split(fillet2_piece_32a, bisect_by=Plane(origin=(-28.452790229, 24.547209771, 52.224489796), z_dir=(0, 0, 1)), keep=Keep.TOP, mode=Mode.PRIVATE)
    with BuildSketch(Plane(origin=(-26, 25, 52.224489796), x_dir=(0, 0, 1), z_dir=(-1, 0, 0))) as fillet2_piece_32b_section:
        with BuildLine():
            CenterArc((FILLET2_R, -FILLET2_R), FILLET2_R, 90, 90)
            Line((0, -FILLET2_R), (0, 0))
            Line((0, 0), (FILLET2_R, 0))
        make_face()
    fillet2_piece_32b = extrude(amount=7, mode=Mode.PRIVATE)
    fillet2_piece_32b = split(fillet2_piece_32b, bisect_by=Plane(origin=(-28, 24.547209771, 52.677280024), z_dir=(-1, 0, 0)), keep=Keep.TOP, mode=Mode.PRIVATE)
    fillet2_piece_32 = fillet2_piece_32a & fillet2_piece_32b
    add(fillet2_piece_32, mode=Mode.SUBTRACT)

    # Sweep2: sweep along a path in Sketch6
    with BuildLine(Plane(origin=(0, 12.5, 0), x_dir=(1, 0, 0), z_dir=(0, 1, 0))) as sweep2_path:
        Line((22, -35.042835549), (27.019958302, -35.042835549))
        ThreePointArc((27.019958302, -35.042835549), (34.091026114, -32.11390336), (37.019958302, -25.042835549))
        Line((37.019958302, -25.042835549), (37.019958302, -21.236981576))
    # Sketch4 → Sweep2 (sweep)
    with BuildSketch(Plane(origin=(22, 0, 0), x_dir=(0, 0, -1), z_dir=(1, 0, 0))):
        with Locations((-35.042835549, 12.5)):
            Circle(SKETCH4_R)
    sweep(path=sweep2_path.line)

    # Fillet3
    fillet3_edges = [part.edges().sort_by_distance(p)[0] for p in [
        (22, 12.5, 38.542835549),
    ]]
    fillet(fillet3_edges, radius=FILLET3_R)

    # Fillet4
    fillet4_edges = [part.edges().sort_by_distance(p)[0] for p in [
        (40.519958302, 12.5, 21.236981576),
    ]]
    fillet(fillet4_edges, radius=FILLET4_R)


solid = part.part
